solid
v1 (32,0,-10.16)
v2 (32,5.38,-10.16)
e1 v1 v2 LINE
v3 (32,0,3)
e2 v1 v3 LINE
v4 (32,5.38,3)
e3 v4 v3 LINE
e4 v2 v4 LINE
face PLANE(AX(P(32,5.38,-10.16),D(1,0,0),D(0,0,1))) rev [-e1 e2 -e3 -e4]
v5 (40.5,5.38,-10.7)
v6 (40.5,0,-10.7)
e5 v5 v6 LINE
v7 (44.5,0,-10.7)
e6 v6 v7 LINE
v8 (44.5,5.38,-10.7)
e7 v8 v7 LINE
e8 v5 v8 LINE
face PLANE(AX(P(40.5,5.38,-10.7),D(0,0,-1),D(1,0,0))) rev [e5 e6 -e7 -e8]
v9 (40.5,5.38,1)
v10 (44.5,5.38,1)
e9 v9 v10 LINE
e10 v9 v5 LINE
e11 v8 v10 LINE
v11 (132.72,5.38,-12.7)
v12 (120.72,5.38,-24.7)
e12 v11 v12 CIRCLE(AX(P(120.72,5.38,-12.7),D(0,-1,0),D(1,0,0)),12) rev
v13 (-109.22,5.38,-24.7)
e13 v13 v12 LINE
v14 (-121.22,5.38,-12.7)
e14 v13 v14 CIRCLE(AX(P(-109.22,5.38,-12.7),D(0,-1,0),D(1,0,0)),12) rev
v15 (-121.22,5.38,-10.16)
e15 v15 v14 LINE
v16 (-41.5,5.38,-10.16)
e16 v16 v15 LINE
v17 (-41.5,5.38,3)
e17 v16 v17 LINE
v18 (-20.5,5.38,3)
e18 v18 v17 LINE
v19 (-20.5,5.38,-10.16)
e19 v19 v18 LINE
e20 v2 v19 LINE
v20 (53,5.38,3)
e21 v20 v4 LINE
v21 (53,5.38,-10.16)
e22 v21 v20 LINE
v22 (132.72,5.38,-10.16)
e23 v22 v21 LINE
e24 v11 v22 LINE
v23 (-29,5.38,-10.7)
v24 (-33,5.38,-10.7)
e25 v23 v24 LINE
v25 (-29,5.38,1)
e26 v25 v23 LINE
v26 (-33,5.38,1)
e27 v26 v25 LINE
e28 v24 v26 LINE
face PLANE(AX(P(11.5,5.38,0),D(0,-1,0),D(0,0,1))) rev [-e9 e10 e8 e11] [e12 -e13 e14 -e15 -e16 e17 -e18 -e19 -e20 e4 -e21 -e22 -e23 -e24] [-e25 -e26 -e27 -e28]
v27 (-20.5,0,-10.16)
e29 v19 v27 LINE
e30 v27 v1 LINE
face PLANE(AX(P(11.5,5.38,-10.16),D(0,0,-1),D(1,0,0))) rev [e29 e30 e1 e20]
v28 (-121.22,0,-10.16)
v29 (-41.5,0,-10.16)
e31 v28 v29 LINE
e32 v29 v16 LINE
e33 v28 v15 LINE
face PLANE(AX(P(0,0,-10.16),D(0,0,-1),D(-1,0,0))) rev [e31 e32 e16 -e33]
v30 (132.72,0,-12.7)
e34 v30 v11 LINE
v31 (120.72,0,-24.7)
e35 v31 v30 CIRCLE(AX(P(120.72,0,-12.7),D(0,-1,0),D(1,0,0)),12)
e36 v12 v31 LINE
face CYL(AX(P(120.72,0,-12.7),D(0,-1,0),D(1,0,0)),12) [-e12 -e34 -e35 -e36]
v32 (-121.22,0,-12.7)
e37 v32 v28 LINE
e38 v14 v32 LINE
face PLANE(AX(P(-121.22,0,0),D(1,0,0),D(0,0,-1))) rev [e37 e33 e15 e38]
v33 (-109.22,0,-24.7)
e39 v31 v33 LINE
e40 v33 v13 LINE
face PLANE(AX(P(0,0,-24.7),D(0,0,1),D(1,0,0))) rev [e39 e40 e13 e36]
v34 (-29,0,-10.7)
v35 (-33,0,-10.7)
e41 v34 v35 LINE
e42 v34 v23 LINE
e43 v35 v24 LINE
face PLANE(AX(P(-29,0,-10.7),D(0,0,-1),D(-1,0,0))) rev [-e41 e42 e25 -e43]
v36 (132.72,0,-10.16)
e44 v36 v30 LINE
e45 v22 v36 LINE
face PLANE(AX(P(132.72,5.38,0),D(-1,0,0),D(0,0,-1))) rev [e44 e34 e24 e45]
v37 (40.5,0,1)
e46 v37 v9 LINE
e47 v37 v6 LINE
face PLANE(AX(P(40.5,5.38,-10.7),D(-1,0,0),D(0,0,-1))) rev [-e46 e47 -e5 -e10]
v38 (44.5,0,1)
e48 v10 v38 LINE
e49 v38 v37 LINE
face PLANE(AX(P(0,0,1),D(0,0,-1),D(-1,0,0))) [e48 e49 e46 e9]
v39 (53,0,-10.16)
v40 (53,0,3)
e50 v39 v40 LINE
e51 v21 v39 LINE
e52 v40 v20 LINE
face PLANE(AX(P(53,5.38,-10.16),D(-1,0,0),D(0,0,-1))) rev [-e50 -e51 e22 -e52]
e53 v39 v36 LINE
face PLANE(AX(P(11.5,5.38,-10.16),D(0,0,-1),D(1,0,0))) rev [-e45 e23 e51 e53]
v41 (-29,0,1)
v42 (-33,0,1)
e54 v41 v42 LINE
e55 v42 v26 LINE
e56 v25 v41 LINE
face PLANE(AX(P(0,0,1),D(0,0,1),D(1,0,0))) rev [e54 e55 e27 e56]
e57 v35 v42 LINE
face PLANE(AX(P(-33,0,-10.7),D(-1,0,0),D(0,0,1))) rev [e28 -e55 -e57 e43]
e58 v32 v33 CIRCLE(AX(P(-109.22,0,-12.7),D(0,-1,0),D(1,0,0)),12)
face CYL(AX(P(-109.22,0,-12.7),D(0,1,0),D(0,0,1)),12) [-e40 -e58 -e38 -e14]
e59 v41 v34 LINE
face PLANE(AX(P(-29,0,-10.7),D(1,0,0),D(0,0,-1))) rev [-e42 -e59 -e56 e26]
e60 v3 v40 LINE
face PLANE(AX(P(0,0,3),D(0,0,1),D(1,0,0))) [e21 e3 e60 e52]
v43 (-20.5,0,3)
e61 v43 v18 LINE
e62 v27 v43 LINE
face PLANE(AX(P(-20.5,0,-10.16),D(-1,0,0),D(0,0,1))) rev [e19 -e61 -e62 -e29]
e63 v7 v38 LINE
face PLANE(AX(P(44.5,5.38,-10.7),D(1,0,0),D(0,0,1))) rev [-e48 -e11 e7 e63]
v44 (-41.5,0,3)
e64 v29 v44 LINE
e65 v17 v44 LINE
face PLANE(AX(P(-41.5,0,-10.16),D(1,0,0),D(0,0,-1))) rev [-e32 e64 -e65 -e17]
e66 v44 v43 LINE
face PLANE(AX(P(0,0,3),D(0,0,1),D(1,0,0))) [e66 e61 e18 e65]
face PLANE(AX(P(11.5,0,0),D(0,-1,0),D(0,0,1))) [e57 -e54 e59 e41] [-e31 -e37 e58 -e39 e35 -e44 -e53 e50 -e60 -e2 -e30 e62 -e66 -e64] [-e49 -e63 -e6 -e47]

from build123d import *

# Parameters (mm, degrees)
SKETCH1_W             = 62
SKETCH1_H             = 12.7
BOSS_EXTRUDE1_DEPTH   = 5.38
SKETCH2_W             = 20.5
SKETCH2_H             = 5.38
CUT_EXTRUDE1_DEPTH    = 10.16
SKETCH3_W             = 4
SKETCH3_H             = 8.7
CUT_EXTRUDE2_DEPTH    = 5.38
SKETCH4_W             = 2.54
SKETCH4_H             = 5.38
BOSS_EXTRUDE2_DEPTH   = 59.22
SKETCH5_W             = 2.54
SKETCH5_H             = 5.38
BOSS_EXTRUDE3_DEPTH   = 11.5
BODY_MOVE_COPY3_ANGLE = 180
SKETCH6_W             = 21
SKETCH6_H             = 5.38
BOSS_EXTRUDE4_DEPTH   = 3
SKETCH7_W             = 21
SKETCH7_H             = 5.38
BOSS_EXTRUDE5_DEPTH   = 3
SKETCH8_W             = 4
SKETCH8_H             = 5.38
CUT_EXTRUDE3_DEPTH    = 3
SKETCH9_W             = 4
SKETCH9_H             = 5.38
CUT_EXTRUDE4_DEPTH    = 3
SKETCH11_W            = 253.94
SKETCH11_H            = 5.38
BOSS_EXTRUDE6_DEPTH   = 12
FILLET1_R             = 12


with BuildPart() as part:
    # Sketch1 → Boss-Extrude1 (new body)
    with BuildSketch(Plane(origin=(0, 0, 0), x_dir=(1, 0, 0), z_dir=(0, 1, 0))):
        with Locations((-31, 6.35)):
            Rectangle(SKETCH1_W, SKETCH1_H)
    extrude(amount=BOSS_EXTRUDE1_DEPTH)

    # Sketch2 → Cut-Extrude1 (cut)
    with BuildSketch(Plane.XY):
        with Locations((-51.75, 2.69)):
            Rectangle(SKETCH2_W, SKETCH2_H)
        with Locations((-10.25, 2.69)):
            Rectangle(SKETCH2_W, SKETCH2_H)
    extrude(amount=-CUT_EXTRUDE1_DEPTH, mode=Mode.SUBTRACT)

    # Sketch3 → Cut-Extrude2 (cut)
    with BuildSketch(Plane(origin=(0, 5.38, 0), x_dir=(1, 0, 0), z_dir=(0, 1, 0))):
        with Locations((-31, 6.35)):
            Rectangle(SKETCH3_W, SKETCH3_H)
    extrude(amount=-CUT_EXTRUDE2_DEPTH, mode=Mode.SUBTRACT)

    # Sketch4 → Boss-Extrude2 (add)
    with BuildSketch(Plane.ZY.offset(62)):
        with Locations((-11.43, 2.69)):
            Rectangle(SKETCH4_W, SKETCH4_H)
    extrude(amount=BOSS_EXTRUDE2_DEPTH)


with BuildPart() as body_2:
    # Body-Move/Copy1: copy of part
    add(part.part.moved(Location((0, 31.265873305, 0))))


with BuildPart() as part_1:
    add(part.part)

    # Sketch5 → Boss-Extrude3 (add)
    with BuildSketch(Plane(origin=(0, 0, 0), x_dir=(0, 0, -1), z_dir=(1, 0, 0))):
        with Locations((11.43, 2.69)):
            Rectangle(SKETCH5_W, SKETCH5_H)
    extrude(amount=BOSS_EXTRUDE3_DEPTH)


with BuildPart() as body_2_1:
    # Body-Move/Copy2: moved
    add(body_2.part.moved(Location((152.693560216, 0, 0))))


with BuildPart() as body_2_2:
    # Body-Move/Copy3: moved
    add(body_2_1.part.rotate(Axis((92.083560216, 33.955873305, 0), (0, 0, 1)), BODY_MOVE_COPY3_ANGLE))


with BuildPart() as body_2_3:
    # Body-Move/Copy4: read off the stored shape, not the designer's step
    # Body-Move/Copy4: moved
    add(body_2_2.part.moved(Location((-19.9735602, -31.2658733, 0))))

    # Combine1: union part
    add(part_1.part)

    # Sketch6 → Boss-Extrude4 (add)
    with BuildSketch(Plane.XY):
        with Locations((-31, 2.69)):
            Rectangle(SKETCH6_W, SKETCH6_H)
    extrude(amount=BOSS_EXTRUDE4_DEPTH)

    # Sketch7 → Boss-Extrude5 (add)
    with BuildSketch(Plane.XY):
        with Locations((42.5, 2.69)):
            Rectangle(SKETCH7_W, SKETCH7_H)
    extrude(amount=BOSS_EXTRUDE5_DEPTH)

    # Sketch8 → Cut-Extrude3 (cut)
    with BuildSketch(Plane(origin=(0, 0, -2), x_dir=(-1, 0, 0), z_dir=(0, 0, -1))):
        with Locations((31, 2.69)):
            Rectangle(SKETCH8_W, SKETCH8_H)
    extrude(amount=-CUT_EXTRUDE3_DEPTH, mode=Mode.SUBTRACT)

    # Sketch9 → Cut-Extrude4 (cut)
    with BuildSketch(Plane(origin=(0, 0, -2), x_dir=(-1, 0, 0), z_dir=(0, 0, -1))):
        with Locations((-42.5, 2.69)):
            Rectangle(SKETCH9_W, SKETCH9_H)
    extrude(amount=-CUT_EXTRUDE4_DEPTH, mode=Mode.SUBTRACT)

    # Sketch11 → Boss-Extrude6 (add)
    with BuildSketch(Plane(origin=(0, 0, -12.7), x_dir=(-1, 0, 0), z_dir=(0, 0, -1))):
        with Locations((-5.75, 2.69)):
            Rectangle(SKETCH11_W, SKETCH11_H)
    extrude(amount=BOSS_EXTRUDE6_DEPTH)

    # Fillet1
    fillet1_edges = [body_2_3.edges().sort_by_distance(p)[0] for p in [
        (132.72, 2.69, -24.7),
        (-121.22, 2.69, -24.7),
    ]]
    fillet(fillet1_edges, radius=FILLET1_R)


solid = body_2_3.part
